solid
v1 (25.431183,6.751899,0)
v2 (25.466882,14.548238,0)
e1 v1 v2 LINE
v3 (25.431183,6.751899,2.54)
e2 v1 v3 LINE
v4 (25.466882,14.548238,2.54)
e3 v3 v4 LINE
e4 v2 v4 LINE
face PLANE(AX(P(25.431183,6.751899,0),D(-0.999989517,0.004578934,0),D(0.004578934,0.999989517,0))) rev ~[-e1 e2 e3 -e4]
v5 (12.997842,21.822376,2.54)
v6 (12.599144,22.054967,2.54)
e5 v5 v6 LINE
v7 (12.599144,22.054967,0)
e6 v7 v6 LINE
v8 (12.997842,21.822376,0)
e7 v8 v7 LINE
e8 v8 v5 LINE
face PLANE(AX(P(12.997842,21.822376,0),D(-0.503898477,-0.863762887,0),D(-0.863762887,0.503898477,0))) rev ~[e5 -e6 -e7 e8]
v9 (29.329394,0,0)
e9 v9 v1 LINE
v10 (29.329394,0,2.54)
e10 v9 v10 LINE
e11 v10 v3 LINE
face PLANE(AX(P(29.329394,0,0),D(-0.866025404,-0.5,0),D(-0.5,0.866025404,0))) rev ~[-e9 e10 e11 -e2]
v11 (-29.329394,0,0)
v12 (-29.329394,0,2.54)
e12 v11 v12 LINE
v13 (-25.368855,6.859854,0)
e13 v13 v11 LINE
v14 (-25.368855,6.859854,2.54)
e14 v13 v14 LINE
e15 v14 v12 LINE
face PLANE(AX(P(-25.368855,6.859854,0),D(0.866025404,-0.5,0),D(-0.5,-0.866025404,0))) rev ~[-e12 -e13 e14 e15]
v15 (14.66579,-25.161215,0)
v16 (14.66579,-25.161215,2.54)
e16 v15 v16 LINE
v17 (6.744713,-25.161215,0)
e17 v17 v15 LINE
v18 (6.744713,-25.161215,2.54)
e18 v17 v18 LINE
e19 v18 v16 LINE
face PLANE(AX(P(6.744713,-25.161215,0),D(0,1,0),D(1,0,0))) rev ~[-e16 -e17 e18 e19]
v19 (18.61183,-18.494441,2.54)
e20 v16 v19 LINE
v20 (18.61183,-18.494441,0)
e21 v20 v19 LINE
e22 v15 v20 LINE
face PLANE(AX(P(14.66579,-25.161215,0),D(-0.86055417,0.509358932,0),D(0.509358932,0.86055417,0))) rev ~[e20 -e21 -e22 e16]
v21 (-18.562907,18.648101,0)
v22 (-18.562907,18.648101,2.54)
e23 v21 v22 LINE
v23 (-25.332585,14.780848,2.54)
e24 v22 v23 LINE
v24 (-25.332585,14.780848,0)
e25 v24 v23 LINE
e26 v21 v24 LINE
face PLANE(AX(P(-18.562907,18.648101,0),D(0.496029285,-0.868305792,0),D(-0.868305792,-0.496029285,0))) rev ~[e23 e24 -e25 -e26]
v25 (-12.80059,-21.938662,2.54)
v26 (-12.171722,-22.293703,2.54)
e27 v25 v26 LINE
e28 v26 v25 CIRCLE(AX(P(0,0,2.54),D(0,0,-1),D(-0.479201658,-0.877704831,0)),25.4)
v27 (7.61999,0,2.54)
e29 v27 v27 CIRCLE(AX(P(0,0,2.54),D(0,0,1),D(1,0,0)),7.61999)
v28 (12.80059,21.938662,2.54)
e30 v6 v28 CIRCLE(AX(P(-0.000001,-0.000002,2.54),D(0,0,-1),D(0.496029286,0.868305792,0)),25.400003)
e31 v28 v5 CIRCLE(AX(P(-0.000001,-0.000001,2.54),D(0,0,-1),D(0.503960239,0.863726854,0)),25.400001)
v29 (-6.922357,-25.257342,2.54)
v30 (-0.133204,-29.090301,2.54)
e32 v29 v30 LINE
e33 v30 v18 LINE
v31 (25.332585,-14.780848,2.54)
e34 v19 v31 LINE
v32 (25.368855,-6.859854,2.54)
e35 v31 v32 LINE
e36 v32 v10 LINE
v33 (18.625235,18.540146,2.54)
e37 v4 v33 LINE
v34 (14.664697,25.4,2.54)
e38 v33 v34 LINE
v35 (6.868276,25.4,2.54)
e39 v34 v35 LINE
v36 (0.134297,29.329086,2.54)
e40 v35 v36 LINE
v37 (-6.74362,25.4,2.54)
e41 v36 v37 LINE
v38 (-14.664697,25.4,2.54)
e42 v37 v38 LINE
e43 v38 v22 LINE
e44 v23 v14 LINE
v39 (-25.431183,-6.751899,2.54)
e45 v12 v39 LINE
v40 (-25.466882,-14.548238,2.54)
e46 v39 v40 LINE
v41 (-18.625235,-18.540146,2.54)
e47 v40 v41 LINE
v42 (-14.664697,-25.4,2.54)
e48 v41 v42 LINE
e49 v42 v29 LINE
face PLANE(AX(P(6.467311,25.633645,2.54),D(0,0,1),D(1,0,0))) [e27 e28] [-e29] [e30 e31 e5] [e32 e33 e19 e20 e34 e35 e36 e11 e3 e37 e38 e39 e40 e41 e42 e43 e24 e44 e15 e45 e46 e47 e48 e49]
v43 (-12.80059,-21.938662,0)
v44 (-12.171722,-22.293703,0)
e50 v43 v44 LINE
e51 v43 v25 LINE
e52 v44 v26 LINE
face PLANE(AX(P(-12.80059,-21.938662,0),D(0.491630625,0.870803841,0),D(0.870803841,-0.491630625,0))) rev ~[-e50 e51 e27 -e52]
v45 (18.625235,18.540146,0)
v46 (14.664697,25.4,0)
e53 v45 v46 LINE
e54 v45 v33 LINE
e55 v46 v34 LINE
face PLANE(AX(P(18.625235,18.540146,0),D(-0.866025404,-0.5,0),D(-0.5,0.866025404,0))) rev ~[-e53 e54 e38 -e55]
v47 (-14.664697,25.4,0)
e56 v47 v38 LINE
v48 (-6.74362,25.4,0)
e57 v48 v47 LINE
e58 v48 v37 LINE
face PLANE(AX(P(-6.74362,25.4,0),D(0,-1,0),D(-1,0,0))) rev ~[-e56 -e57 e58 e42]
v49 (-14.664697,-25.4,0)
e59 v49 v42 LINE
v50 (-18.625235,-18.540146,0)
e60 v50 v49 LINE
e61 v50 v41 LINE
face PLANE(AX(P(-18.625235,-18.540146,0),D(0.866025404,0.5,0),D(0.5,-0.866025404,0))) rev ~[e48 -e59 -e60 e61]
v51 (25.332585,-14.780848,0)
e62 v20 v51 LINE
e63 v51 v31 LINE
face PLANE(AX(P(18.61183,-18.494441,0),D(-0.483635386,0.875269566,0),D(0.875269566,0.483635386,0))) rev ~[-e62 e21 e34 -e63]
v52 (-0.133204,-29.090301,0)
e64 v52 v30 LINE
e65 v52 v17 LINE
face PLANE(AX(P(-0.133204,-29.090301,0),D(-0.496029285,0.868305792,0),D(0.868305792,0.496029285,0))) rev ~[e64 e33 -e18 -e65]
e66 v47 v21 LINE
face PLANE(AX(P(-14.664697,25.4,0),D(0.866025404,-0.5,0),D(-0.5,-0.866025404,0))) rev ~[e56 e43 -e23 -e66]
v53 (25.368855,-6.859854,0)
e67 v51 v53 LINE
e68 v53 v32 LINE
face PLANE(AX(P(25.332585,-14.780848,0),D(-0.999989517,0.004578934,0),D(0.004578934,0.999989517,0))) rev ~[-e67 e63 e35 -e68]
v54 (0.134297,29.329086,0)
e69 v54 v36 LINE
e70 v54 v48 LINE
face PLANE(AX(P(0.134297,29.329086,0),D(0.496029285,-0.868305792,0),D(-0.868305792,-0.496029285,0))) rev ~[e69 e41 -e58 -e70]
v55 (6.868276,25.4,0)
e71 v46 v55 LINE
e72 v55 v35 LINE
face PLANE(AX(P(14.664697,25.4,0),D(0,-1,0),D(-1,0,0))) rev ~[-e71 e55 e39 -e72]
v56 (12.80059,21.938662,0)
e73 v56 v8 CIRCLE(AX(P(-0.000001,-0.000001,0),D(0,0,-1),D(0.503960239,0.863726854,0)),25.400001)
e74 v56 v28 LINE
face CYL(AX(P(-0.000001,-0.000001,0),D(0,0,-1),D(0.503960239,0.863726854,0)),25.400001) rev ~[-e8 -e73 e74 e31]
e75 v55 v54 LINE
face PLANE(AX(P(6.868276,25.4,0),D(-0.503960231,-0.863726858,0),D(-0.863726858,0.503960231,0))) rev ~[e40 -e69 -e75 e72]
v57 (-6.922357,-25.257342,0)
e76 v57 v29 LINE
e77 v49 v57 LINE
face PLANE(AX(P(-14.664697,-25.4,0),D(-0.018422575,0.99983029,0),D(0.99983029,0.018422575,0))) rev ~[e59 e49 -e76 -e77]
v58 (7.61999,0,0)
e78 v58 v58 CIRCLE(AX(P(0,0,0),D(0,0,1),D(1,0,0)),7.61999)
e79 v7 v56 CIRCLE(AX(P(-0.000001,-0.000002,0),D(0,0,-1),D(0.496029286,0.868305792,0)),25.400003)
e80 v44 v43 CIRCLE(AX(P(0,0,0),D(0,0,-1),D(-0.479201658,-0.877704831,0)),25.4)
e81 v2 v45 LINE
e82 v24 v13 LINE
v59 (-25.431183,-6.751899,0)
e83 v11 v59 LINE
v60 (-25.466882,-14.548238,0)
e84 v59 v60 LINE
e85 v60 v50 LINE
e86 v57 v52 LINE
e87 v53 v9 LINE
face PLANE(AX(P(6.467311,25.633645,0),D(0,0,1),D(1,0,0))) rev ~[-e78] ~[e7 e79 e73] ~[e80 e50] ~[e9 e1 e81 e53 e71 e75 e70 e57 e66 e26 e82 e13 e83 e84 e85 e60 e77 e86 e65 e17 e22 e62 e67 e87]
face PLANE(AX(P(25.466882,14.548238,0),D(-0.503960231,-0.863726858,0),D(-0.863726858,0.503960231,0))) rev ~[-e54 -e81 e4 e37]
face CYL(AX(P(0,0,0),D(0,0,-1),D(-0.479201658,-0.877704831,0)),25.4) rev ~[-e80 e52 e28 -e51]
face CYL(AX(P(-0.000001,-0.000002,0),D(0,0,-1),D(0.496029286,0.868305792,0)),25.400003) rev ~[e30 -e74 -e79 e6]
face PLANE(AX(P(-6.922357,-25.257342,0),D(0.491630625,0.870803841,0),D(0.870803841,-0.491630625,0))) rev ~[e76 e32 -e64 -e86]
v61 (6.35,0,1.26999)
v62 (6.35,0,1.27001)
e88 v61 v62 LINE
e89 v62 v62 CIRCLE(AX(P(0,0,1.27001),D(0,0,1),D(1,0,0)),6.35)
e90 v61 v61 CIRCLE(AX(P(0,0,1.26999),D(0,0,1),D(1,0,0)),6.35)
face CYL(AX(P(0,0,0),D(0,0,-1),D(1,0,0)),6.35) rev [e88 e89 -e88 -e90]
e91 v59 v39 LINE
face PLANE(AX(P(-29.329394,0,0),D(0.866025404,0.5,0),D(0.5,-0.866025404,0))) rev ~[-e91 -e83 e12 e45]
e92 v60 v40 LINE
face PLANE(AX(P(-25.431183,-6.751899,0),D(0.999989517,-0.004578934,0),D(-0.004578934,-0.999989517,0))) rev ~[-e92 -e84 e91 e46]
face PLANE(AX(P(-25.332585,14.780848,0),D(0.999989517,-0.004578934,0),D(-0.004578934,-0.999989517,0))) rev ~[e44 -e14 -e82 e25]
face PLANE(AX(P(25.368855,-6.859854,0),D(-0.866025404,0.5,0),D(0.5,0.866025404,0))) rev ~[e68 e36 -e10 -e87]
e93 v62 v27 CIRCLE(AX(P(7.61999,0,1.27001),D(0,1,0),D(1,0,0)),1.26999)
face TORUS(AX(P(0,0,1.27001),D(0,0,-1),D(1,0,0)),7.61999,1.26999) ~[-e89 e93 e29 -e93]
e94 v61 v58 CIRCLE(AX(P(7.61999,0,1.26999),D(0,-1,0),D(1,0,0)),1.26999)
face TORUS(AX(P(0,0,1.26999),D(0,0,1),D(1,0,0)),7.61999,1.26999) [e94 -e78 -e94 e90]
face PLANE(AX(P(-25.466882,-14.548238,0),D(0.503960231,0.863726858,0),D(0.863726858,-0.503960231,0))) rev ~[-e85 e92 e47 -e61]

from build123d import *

# Parameters (mm, degrees)
F0_R     = 6.35
F1_DEPTH = 2.54
F2_R     = 1.26999


# Not quite as in the source:
# - a fillet or chamfer is up to 0.001 mm smaller than in the source, because OpenCascade refuses the exact size


with BuildPart() as f1:
    # F0 (on Top) → F1 (new body)
    with BuildSketch(Plane.XY):
        with BuildLine():
            Line((0.1342973504, 29.3290862039), (12.5991438484, 22.0549671115))
            ThreePointArc((12.5991438484, 22.0549671115), (12.7000000903, 21.997045204), (12.8005900541, 21.9386620893))
            Line((12.8005900541, 21.9386620893), (6.8682756911, 25.4))
            Line((6.8682756911, 25.4), (0.1342973504, 29.3290862039))
        make_face()
        with BuildLine():
            ThreePointArc((-12.5991438484, 22.0549671115), (0, 25.4), (12.5991438484, 22.0549671115))
            Line((12.5991438484, 22.0549671115), (0.1342973504, 29.3290862039))
            Line((0.1342973504, 29.3290862039), (-6.7436197563, 25.4))
            Line((-6.7436197563, 25.4), (-12.5991438484, 22.0549671115))
        make_face()
        Polygon((-18.5629074106, 18.6481012287), (-12.5991438484, 22.0549671115), (-6.7436197563, 25.4), (-14.6646968374, 25.4), align=None)
        with BuildLine():
            ThreePointArc((-25.3997337218, 0.1163050384), (-21.9386621638, 12.8005899263), (-12.5991438484, 22.0549671115))
            Line((-12.5991438484, 22.0549671115), (-18.5629074106, 18.6481012287))
            Line((-18.5629074106, 18.6481012287), (-25.3325850472, 14.780848019))
            Line((-25.3325850472, 14.780848019), (-25.3688551343, 6.8598539776))
            Line((-25.3688551343, 6.8598539776), (-25.3997337218, 0.1163050384))
        make_face()
        with BuildLine():
            Line((18.625235378, 18.5401460224), (12.8005900541, 21.9386620893))
            ThreePointArc((12.8005900541, 21.9386620893), (12.8993470878, 21.8807414113), (12.9978420445, 21.822376181))
            Line((12.9978420446, 21.822376181), (25.4668823975, 14.5482381848))
            Line((25.4668823975, 14.5482381848), (18.625235378, 18.5401460224))
        make_face()
        Polygon((6.8682756911, 25.4), (12.8005900541, 21.9386620893), (18.625235378, 18.5401460224), (14.6646968374, 25.4), align=None)
        with BuildLine():
            Line((25.4668823975, 14.5482381848), (12.9978420446, 21.822376181))
            ThreePointArc((12.9978420445, 21.822376181), (22.0828574683, 12.550195458), (25.4, 0))
            ThreePointArc((25.4, 0), (25.3999334305, -0.0581525957), (25.3997337225, -0.1163048866))
            Line((25.3997337225, -0.1163048866), (25.4002662804, 0))
            Line((25.4002662804, 0), (25.4311831017, 6.7518987713))
            Line((25.4311831017, 6.7518987713), (25.4668823975, 14.5482381848))
        make_face()
        Polygon((-25.4002662804, 0), (-25.3997337218, 0.1163050384), (-25.3688551343, 6.8598539776), (-29.3293936748, 0), (-25.4311831017, -6.7518987713), align=None)
        with BuildLine():
            ThreePointArc((-21.9970455091, -12.6999995618), (-24.5495027703, -6.5178151043), (-25.3997337218, 0.1163050384))
            Line((-25.3997337218, 0.1163050384), (-25.4002662804, 0))
            Line((-25.4002662804, 0), (-25.4311831017, -6.7518987713))
            Line((-25.4311831017, -6.7518987713), (-21.9970455091, -12.6999995618))
        make_face()
        with BuildLine():
            ThreePointArc((-12.800589874, -21.9386621944), (-18.0015854544, -17.9193448856), (-21.9970455091, -12.6999995618))
            Line((-21.9970455091, -12.6999995618), (-18.625235378, -18.5401460224))
            Line((-18.625235378, -18.5401460224), (-12.800589874, -21.9386621944))
        make_face()
        Polygon((-18.625235378, -18.5401460224), (-21.9970455091, -12.6999995618), (-25.4311831017, -6.7518987713), (-25.4668823975, -14.5482381848), align=None)
        with BuildLine():
            Line((25.3688551343, -6.8598539776), (25.3997337225, -0.1163048866))
            ThreePointArc((25.3997337225, -0.1163048866), (22.6367712709, -11.5211365077), (15.0421744156, -20.4668754052))
            Line((15.0421744156, -20.4668754052), (18.6118299226, -18.4944410973))
            Line((18.6118299226, -18.4944410973), (25.3325850472, -14.780848019))
            Line((25.3325850472, -14.780848019), (25.3688551343, -6.8598539776))
        make_face()
        Polygon((25.4002662804, 0), (25.3997337225, -0.1163048866), (25.3688551343, -6.8598539776), (29.3293936748, 0), (25.4311831017, 6.7518987713), align=None)
        with BuildLine():
            ThreePointArc((-12.1717221157, -22.2937027149), (-12.4874178664, -22.1184175526), (-12.800589874, -21.9386621944))
            Line((-12.800589874, -21.9386621944), (-18.625235378, -18.5401460224))
            Line((-18.625235378, -18.5401460224), (-14.6646968374, -25.4))
            Line((-14.6646968374, -25.4), (-6.9223574365, -25.2573419592))
            Line((-6.9223574365, -25.2573419592), (-12.1717221157, -22.2937027149))
        make_face()
        with BuildLine():
            Line((18.6118299226, -18.4944410973), (15.0421744156, -20.4668754052))
            ThreePointArc((15.0421744156, -20.4668754052), (12.4565037471, -22.1358423015), (9.6879678482, -23.4798483592))
            Line((9.6879678482, -23.4798483592), (6.7447131478, -25.1612151536))
            Line((6.7447131478, -25.1612151536), (14.6657902289, -25.1612151536))
            Line((14.6657902289, -25.1612151536), (18.6118299226, -18.4944410973))
        make_face()
        with BuildLine():
            ThreePointArc((9.6879678482, -23.4798483592), (-1.3762246139, -25.3626892465), (-12.1717221157, -22.2937027149))
            Line((-12.1717221157, -22.2937027149), (-6.9223574365, -25.2573419592))
            Line((-6.9223574365, -25.2573419592), (-0.1332039589, -29.0903013575))
            Line((-0.1332039589, -29.0903013575), (6.7447131478, -25.1612151536))
            Line((6.7447131478, -25.1612151536), (9.6879678482, -23.4798483592))
        make_face()
        with BuildLine():
            Line((12.9978420446, 21.822376181), (12.5991438484, 22.0549671115))
            ThreePointArc((12.5991438484, 22.0549671115), (0, 25.4), (-12.5991438484, 22.0549671115))
            ThreePointArc((-12.5991438484, 22.0549671115), (-21.9386621638, 12.8005899263), (-25.3997337218, 0.1163050384))
            ThreePointArc((-25.3997337218, 0.1163050384), (-24.5495027703, -6.5178151043), (-21.9970455091, -12.6999995618))
            ThreePointArc((-21.9970455091, -12.6999995618), (-18.0015854544, -17.9193448856), (-12.800589874, -21.9386621944))
            Line((-12.800589874, -21.9386621944), (-12.1717221157, -22.2937027149))
            ThreePointArc((-12.1717221157, -22.2937027149), (-1.3762246139, -25.3626892465), (9.6879678482, -23.4798483592))
            Line((9.6879678482, -23.4798483592), (12.6002372398, -21.8161822651))
            Line((12.6002372398, -21.8161822651), (15.0421744156, -20.4668754052))
            ThreePointArc((15.0421744156, -20.4668754052), (22.6367712709, -11.5211365077), (25.3997337225, -0.1163048866))
            ThreePointArc((25.3997337225, -0.1163048866), (25.3999334305, -0.0581525957), (25.4, 0))
            ThreePointArc((25.4, 0), (22.0828574683, 12.550195458), (12.9978420445, 21.822376181))
        make_face()
        Circle(F0_R, mode=Mode.SUBTRACT)
        with BuildLine():
            ThreePointArc((9.6879678482, -23.4798483592), (12.4565037471, -22.1358423015), (15.0421744156, -20.4668754052))
            Line((15.0421744156, -20.4668754052), (12.6002372398, -21.8161822651))
            Line((12.6002372398, -21.8161822651), (9.6879678482, -23.4798483592))
        make_face()
    extrude(amount=F1_DEPTH)

    # F2 (radius 1.27 in the source; OpenCascade refuses exactly that, so slightly less here)
    f2_edges = [f1.edges().sort_by_distance(p)[0] for p in [
        (-6.35, 0, 2.54),
        (-6.35, 0, 0),
    ]]
    fillet(f2_edges, radius=F2_R)


solid = f1.part
